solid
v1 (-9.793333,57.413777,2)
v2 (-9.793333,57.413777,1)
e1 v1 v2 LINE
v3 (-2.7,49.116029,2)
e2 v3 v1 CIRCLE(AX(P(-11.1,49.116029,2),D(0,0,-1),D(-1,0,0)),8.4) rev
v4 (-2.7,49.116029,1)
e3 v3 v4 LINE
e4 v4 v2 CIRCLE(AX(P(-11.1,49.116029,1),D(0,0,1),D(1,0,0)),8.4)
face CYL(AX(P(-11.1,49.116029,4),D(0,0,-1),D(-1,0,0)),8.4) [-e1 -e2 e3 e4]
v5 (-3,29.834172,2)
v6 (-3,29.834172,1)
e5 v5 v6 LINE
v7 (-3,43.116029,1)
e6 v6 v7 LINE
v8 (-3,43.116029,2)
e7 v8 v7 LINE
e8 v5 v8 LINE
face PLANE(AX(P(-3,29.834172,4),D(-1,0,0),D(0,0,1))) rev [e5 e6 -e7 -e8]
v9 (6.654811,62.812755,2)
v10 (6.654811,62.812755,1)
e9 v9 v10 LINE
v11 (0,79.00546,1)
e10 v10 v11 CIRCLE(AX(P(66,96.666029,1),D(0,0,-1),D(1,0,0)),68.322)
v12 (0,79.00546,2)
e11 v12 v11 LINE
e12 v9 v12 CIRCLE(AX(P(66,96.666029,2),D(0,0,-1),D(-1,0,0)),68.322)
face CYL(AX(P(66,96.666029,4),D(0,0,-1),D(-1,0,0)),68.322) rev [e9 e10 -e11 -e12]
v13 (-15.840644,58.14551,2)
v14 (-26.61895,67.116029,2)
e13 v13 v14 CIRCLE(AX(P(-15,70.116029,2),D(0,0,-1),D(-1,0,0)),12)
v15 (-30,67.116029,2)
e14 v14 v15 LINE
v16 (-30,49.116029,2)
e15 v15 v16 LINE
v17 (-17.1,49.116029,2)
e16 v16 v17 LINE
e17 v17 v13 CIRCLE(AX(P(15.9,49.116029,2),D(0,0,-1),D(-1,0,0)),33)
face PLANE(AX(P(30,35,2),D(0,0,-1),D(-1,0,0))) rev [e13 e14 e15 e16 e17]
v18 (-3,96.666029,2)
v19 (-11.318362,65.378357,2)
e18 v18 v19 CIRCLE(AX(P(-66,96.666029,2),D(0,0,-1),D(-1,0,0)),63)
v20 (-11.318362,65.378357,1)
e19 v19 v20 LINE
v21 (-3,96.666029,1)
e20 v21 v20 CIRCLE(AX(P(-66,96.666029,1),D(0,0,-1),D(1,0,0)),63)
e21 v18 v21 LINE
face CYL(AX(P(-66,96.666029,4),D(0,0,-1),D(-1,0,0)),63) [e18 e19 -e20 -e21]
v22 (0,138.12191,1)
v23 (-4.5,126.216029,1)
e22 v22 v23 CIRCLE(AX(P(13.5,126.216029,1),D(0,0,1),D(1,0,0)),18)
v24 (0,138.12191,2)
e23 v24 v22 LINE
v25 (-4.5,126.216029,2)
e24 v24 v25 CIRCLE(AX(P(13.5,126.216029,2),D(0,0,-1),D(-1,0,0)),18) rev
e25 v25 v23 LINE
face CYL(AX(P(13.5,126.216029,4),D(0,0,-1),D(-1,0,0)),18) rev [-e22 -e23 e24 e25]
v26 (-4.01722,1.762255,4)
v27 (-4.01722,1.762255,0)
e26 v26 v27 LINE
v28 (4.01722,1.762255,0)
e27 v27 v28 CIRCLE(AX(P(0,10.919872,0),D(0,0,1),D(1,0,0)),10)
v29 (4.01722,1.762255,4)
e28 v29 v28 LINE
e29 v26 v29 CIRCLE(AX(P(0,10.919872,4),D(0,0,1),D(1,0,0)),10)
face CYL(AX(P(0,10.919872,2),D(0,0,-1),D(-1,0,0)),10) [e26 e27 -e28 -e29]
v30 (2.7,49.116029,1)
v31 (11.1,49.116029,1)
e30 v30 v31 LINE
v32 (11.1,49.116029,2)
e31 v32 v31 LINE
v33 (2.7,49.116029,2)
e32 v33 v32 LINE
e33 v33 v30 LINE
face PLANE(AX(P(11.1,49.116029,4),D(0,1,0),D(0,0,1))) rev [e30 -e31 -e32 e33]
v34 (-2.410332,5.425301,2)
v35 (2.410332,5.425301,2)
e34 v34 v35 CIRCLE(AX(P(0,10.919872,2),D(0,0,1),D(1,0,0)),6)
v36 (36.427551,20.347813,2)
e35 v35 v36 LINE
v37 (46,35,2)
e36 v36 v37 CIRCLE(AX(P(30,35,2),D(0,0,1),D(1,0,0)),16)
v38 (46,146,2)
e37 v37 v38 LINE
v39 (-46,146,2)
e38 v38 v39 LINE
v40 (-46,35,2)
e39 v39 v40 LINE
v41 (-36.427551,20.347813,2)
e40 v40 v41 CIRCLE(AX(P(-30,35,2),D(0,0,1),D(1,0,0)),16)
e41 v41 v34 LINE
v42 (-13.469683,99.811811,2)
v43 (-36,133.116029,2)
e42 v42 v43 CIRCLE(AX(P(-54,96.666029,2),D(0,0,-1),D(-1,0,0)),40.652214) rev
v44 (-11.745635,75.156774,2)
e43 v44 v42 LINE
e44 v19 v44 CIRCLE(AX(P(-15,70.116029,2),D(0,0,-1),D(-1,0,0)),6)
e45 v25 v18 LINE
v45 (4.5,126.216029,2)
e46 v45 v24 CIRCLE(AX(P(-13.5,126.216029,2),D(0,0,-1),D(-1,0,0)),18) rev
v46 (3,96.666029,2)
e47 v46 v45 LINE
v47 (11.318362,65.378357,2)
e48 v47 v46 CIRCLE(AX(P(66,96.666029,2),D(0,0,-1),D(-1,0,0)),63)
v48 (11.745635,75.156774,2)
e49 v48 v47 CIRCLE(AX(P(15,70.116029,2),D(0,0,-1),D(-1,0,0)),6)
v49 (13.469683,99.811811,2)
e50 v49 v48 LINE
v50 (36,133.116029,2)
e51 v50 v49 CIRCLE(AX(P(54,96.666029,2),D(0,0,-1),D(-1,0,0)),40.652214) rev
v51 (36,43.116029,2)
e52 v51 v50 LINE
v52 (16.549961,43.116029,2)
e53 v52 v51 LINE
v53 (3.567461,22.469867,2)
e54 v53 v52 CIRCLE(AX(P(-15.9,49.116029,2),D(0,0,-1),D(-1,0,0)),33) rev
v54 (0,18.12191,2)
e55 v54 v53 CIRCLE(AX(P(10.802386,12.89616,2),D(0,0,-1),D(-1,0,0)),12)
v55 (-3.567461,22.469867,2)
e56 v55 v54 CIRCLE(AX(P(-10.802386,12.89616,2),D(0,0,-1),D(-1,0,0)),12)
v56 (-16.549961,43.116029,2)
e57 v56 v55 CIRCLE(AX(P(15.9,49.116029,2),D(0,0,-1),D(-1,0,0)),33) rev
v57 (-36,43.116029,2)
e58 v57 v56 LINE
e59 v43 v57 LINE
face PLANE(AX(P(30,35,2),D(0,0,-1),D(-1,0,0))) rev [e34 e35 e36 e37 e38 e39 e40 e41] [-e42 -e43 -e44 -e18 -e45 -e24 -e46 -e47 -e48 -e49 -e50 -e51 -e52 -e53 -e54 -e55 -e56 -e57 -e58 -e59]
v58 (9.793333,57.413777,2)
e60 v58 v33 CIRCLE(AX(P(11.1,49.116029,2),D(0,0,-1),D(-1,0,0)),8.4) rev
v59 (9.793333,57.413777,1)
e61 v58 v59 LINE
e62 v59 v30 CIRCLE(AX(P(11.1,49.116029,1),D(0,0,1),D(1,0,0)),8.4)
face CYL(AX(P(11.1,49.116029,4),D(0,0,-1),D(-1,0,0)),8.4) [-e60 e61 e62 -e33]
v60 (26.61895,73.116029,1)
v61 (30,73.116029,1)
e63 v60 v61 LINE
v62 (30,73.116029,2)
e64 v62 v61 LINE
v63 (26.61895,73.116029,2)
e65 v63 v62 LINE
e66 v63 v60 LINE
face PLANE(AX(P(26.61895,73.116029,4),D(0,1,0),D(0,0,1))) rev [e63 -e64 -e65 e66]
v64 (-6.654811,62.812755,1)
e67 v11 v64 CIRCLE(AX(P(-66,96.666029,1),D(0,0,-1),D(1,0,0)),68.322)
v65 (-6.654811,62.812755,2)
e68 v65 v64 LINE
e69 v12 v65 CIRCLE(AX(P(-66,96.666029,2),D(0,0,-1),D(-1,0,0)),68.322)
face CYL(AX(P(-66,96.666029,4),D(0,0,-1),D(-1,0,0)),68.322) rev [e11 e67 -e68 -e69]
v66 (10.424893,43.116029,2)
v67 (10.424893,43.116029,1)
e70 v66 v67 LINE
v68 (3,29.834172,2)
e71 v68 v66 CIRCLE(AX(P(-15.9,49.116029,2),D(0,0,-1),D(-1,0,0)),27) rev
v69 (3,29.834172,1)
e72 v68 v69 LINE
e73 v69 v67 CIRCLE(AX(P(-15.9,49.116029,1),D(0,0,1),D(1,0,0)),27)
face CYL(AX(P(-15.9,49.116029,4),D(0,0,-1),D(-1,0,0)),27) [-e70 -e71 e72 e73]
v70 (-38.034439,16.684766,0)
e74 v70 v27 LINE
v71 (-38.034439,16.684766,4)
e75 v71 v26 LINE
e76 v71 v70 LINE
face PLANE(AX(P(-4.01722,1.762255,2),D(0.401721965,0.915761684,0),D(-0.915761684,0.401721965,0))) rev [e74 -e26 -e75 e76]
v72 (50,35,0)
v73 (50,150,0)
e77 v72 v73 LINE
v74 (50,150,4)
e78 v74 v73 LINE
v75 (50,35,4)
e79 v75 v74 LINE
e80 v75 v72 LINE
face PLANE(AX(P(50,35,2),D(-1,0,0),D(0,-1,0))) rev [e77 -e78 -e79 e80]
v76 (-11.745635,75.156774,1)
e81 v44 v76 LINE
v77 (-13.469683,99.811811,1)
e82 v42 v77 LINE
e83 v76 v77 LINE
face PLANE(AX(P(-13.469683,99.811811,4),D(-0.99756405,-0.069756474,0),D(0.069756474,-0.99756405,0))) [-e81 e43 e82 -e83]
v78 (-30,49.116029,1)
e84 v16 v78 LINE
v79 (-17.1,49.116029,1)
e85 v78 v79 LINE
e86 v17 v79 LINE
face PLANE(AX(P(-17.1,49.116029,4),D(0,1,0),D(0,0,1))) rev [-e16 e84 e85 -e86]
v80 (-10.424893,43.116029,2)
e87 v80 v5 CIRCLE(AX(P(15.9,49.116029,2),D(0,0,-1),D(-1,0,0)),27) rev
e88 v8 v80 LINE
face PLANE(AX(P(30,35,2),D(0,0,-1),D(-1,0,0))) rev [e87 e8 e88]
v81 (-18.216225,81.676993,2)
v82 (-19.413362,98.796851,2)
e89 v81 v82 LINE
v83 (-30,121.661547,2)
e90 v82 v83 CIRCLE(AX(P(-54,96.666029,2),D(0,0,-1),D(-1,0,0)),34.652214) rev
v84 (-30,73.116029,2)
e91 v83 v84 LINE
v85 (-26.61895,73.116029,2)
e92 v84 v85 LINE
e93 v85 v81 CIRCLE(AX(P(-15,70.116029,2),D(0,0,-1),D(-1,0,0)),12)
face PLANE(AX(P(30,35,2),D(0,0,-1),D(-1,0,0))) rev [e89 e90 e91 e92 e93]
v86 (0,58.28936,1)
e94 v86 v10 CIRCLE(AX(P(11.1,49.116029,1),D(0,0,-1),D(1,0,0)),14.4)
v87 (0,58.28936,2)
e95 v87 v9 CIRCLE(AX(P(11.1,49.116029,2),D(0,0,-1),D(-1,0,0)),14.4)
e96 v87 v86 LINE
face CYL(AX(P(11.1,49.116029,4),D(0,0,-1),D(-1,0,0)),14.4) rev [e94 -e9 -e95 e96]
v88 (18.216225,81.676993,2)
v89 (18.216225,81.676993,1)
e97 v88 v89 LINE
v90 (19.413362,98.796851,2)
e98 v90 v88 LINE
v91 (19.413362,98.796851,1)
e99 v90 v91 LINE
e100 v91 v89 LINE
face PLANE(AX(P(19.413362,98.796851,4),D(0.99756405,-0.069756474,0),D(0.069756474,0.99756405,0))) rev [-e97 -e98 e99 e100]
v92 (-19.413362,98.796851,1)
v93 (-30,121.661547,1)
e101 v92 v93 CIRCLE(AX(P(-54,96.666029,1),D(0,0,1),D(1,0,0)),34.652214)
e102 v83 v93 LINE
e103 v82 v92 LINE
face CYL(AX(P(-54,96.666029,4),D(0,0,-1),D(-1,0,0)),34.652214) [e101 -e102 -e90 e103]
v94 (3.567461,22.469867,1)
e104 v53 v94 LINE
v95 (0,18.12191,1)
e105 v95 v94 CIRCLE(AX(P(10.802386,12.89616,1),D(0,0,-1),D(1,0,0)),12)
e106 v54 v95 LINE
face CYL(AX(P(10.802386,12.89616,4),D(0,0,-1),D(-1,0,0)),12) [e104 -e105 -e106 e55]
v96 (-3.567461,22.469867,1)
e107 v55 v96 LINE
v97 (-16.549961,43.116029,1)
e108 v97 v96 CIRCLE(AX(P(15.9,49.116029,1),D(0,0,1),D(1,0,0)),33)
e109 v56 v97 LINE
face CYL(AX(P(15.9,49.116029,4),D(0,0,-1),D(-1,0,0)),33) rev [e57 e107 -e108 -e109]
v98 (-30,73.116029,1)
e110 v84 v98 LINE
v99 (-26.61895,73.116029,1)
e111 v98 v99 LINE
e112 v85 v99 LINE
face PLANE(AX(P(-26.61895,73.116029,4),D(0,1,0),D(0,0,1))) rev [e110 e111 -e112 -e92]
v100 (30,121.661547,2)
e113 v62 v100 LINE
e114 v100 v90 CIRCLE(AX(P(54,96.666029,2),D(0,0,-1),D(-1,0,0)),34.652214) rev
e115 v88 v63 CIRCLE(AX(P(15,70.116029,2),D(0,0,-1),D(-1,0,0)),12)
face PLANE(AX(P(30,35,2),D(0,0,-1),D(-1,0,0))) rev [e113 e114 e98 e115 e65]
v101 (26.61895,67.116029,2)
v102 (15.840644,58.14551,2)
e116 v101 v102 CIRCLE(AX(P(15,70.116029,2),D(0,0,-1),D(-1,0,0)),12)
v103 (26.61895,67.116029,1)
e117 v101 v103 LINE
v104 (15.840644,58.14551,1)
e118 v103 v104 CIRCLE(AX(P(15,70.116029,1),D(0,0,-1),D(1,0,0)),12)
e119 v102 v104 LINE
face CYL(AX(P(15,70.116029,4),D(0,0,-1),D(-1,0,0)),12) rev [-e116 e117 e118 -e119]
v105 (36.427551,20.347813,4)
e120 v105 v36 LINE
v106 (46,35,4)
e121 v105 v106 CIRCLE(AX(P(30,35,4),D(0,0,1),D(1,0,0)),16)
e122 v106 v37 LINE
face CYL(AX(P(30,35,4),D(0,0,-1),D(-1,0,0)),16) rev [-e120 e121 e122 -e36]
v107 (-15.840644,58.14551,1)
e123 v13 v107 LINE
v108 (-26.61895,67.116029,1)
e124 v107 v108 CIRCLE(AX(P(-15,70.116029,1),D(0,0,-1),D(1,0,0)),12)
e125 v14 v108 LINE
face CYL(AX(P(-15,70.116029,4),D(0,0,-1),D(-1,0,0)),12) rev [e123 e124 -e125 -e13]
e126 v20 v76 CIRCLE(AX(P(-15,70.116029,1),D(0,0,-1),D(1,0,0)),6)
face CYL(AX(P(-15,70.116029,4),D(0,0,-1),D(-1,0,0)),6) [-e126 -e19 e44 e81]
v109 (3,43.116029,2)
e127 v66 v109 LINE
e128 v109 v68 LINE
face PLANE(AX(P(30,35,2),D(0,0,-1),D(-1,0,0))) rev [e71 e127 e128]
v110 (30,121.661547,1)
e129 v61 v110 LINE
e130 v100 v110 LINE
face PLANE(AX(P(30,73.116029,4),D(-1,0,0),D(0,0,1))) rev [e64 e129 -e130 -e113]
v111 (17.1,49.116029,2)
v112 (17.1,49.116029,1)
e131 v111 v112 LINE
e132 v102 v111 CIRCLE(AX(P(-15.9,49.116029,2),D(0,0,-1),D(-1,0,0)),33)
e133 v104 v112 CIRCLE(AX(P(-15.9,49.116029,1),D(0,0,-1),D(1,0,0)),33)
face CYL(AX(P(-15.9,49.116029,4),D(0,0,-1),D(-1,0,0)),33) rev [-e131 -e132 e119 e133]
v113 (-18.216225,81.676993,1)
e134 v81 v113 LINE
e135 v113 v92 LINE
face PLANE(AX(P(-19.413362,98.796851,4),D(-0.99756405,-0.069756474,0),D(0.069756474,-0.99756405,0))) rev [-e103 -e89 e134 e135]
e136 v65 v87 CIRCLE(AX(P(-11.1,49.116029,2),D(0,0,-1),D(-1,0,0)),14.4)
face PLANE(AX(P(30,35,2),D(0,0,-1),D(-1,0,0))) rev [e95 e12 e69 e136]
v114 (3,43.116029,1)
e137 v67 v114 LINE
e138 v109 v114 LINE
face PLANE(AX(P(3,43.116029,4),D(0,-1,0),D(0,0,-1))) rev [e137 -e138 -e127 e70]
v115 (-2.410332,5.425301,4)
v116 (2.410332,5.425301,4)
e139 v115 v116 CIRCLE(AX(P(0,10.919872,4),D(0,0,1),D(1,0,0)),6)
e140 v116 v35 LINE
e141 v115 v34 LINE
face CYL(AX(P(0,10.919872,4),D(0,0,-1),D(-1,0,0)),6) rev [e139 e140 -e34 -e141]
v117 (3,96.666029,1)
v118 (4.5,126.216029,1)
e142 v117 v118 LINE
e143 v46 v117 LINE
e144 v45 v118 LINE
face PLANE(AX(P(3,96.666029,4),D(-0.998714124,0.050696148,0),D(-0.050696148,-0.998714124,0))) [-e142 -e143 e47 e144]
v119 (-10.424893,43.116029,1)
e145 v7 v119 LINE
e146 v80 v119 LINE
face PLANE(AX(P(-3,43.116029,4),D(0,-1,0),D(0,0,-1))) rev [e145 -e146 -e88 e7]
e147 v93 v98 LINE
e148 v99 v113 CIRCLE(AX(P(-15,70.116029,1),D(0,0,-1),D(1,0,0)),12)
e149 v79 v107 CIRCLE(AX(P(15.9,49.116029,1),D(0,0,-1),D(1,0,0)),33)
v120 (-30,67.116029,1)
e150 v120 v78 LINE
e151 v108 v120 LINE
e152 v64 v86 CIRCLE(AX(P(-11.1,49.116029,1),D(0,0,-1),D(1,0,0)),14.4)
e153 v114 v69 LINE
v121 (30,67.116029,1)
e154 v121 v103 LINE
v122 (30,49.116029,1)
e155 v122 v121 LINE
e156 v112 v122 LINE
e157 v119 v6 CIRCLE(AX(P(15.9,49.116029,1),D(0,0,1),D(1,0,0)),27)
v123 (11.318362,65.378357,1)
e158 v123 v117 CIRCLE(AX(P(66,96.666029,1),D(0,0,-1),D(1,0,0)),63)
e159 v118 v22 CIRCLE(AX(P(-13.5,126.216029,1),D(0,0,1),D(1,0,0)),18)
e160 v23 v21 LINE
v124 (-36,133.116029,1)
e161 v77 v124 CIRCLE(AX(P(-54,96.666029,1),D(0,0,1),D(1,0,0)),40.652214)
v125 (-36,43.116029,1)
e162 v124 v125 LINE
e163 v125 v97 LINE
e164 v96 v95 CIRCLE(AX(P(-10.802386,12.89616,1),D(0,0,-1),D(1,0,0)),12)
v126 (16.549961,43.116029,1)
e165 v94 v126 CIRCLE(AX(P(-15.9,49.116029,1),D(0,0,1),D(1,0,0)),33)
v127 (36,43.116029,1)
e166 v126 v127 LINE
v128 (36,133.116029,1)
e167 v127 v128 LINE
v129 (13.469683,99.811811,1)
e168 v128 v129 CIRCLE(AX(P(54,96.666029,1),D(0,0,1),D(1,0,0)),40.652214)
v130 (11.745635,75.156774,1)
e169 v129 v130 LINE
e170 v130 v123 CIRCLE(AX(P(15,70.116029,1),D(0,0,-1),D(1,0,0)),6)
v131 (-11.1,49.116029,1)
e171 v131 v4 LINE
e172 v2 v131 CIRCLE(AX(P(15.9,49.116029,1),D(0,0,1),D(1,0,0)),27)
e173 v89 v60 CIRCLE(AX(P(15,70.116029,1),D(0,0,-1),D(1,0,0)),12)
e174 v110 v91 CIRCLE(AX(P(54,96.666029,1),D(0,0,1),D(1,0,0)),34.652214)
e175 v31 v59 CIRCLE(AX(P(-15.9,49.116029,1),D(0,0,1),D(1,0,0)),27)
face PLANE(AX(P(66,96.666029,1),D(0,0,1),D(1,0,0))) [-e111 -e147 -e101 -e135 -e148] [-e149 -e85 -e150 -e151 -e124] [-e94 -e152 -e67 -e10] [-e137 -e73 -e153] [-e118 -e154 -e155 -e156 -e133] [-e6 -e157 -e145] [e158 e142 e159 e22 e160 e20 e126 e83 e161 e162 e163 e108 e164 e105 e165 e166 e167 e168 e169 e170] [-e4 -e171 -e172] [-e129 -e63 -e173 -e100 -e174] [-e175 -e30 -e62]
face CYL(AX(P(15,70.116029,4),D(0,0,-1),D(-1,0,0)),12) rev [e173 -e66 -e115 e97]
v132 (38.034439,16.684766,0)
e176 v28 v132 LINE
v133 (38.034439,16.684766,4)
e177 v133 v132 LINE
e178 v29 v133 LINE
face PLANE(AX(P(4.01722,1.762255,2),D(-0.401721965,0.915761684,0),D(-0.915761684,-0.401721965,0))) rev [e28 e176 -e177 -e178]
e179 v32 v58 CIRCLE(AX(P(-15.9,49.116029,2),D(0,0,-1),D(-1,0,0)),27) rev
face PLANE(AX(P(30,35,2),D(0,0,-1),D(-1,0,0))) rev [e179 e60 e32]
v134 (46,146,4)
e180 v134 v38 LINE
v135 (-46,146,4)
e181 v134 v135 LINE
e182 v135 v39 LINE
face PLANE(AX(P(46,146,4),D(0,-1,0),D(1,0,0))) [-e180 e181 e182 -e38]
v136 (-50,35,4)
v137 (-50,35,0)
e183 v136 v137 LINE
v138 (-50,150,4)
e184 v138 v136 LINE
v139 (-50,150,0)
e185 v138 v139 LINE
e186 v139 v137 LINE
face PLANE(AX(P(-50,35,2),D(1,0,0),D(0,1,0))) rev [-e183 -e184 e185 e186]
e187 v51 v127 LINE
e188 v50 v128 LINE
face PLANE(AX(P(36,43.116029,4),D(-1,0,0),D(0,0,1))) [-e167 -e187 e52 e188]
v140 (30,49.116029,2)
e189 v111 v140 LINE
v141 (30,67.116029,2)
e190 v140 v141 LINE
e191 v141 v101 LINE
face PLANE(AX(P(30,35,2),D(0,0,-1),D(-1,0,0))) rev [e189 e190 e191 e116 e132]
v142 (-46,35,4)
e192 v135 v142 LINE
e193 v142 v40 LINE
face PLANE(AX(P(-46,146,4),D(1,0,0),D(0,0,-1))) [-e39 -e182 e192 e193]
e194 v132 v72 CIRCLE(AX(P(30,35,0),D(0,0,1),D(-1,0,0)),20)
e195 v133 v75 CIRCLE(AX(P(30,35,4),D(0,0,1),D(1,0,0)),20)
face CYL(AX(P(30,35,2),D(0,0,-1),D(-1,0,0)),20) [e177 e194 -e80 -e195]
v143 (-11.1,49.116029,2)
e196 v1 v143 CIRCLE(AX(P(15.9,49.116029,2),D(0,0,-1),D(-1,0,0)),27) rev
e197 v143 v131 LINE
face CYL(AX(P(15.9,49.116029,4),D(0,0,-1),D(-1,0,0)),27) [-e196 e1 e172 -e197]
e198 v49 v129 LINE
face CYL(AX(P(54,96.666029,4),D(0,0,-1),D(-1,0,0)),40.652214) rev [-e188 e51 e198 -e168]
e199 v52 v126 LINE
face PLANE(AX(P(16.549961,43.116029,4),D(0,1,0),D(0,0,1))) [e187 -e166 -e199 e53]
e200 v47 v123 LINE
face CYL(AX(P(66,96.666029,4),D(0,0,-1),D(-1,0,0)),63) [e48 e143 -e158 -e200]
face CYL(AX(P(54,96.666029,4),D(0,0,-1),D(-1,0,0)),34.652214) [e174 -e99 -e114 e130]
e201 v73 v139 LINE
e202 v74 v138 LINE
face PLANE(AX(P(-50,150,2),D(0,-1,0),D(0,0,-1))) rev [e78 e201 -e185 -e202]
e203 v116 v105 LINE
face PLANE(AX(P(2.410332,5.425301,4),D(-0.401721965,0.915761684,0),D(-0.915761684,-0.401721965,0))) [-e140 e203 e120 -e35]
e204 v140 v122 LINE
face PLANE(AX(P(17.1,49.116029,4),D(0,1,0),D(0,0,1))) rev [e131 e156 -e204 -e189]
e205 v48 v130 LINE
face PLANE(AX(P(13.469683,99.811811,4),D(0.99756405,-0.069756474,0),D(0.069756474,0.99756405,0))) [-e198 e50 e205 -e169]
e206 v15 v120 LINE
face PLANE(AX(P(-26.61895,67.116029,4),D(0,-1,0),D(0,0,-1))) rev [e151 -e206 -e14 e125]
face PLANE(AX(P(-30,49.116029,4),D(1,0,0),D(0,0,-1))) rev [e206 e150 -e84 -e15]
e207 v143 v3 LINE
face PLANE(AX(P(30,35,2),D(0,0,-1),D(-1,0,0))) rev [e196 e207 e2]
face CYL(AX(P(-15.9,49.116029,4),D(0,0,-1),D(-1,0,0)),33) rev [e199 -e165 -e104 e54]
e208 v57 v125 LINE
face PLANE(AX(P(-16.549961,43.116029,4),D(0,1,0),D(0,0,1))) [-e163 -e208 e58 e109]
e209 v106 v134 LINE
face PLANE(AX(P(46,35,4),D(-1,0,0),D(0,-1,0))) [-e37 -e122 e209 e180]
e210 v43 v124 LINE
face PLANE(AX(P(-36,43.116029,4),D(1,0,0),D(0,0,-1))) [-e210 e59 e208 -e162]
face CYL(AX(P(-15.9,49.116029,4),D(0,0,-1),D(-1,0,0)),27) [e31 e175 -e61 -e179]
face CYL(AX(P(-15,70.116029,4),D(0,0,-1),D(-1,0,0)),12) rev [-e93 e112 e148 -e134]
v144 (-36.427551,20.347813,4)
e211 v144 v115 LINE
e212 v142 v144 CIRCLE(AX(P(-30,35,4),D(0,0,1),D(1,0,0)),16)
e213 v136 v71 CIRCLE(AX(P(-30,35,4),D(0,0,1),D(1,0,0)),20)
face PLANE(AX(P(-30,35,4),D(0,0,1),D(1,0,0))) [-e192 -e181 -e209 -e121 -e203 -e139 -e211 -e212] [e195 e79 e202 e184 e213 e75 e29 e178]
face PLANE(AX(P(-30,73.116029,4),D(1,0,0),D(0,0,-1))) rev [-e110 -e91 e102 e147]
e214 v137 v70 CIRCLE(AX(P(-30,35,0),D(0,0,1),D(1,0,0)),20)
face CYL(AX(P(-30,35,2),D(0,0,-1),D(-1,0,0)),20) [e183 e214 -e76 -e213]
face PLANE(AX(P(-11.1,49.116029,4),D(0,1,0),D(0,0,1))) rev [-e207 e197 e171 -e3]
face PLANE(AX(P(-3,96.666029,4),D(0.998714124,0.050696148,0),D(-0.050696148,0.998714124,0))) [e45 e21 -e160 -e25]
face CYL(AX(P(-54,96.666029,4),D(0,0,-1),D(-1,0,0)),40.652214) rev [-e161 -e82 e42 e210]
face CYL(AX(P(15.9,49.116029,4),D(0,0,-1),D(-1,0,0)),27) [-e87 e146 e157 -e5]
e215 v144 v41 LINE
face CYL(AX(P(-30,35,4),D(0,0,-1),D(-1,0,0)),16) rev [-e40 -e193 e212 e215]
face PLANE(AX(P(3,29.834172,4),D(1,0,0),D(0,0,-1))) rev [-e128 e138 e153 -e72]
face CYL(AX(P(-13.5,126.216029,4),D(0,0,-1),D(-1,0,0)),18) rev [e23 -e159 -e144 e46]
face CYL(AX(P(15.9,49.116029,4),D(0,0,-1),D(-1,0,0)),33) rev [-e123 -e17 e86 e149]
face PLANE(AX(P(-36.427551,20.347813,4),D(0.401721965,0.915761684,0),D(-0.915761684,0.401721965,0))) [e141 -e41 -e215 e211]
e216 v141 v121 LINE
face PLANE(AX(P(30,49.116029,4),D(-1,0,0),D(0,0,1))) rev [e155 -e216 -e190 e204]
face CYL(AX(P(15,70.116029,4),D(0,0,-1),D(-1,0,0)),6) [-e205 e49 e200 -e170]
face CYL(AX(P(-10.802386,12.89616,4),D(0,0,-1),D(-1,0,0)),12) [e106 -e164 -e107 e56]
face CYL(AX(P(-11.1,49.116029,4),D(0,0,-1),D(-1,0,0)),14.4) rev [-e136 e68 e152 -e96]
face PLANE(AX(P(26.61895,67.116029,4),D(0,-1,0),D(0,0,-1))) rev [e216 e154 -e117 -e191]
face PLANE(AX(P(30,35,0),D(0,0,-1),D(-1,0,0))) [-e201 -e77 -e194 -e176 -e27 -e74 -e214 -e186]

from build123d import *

# Parameters (mm, degrees)
EXTRUDE_1_DEPTH = 2
EXTRUDE_2_DEPTH = 2
OTHER_START     = 1
OTHER_1_DEPTH   = 1


# Read off the part's stored shape, not the designer's step: Полость1
with BuildPart() as part:
    # Эскиз1 → Бобышка-Вытянуть1 (new body)
    with BuildSketch(Plane.XY):
        with BuildLine():
            Line((-4.017219652, 1.762254744), (-38.034439304, 16.684766311))
            ThreePointArc((-38.034439304, 16.684766311), (-46.743488079, 24.061279464), (-50, 35))
            Line((-50, 35), (-50, 150))
            Line((-50, 150), (50, 150))
            Line((50, 150), (50, 35))
            ThreePointArc((50, 35), (46.743488079, 24.061279464), (38.034439304, 16.684766311))
            Line((38.034439304, 16.684766311), (4.017219652, 1.762254744))
            ThreePointArc((4.017219652, 1.762254744), (0, 0.919871589), (-4.017219652, 1.762254744))
        make_face()
    extrude(amount=EXTRUDE_1_DEPTH)

    # Эскиз2 → Бобышка-Вытянуть2 (add)
    with BuildSketch(Plane.XY.offset(2)):
        with BuildLine():
            Line((50, 150), (-50, 150))
            Line((-50, 150), (-50, 35))
            ThreePointArc((-50, 35), (-46.743488079, 24.061279464), (-38.034439304, 16.684766311))
            Line((-38.034439304, 16.684766311), (-4.017219652, 1.762254744))
            ThreePointArc((-4.017219652, 1.762254744), (0, 0.919871589), (4.017219652, 1.762254744))
            Line((4.017219652, 1.762254744), (38.034439304, 16.684766311))
            ThreePointArc((38.034439304, 16.684766311), (46.743488079, 24.061279464), (50, 35))
            Line((50, 35), (50, 150))
        make_face()
        with BuildLine():
            Line((46, 146), (-46, 146))
            Line((-46, 146), (-46, 35))
            ThreePointArc((-46, 35), (-43.394790463, 26.249023571), (-36.427551443, 20.347813049))
            Line((-36.427551443, 20.347813049), (-2.410331791, 5.425301482))
            ThreePointArc((-2.410331791, 5.425301482), (0, 4.919871589), (2.410331791, 5.425301482))
            Line((2.410331791, 5.425301482), (36.427551443, 20.347813049))
            ThreePointArc((36.427551443, 20.347813049), (43.394790463, 26.249023571), (46, 35))
            Line((46, 35), (46, 146))
        make_face(mode=Mode.SUBTRACT)
    extrude(amount=EXTRUDE_2_DEPTH)

    # Полость1 outline → Полость1 (cut)
    with BuildSketch(Plane.XY.offset(OTHER_START)):
        with BuildLine():
            ThreePointArc((11.745635367, 75.156774095), (20.994280281, 69.854105541), (11.31836185, 65.378356547))
            ThreePointArc((11.31836185, 65.378356547), (5.115095453, 80.478737769), (3, 96.666029027))
            Line((3, 96.666029027), (4.5, 126.216029027))
            ThreePointArc((4.5, 126.216029027), (3.337458241, 132.579990058), (0, 138.121909927))
            ThreePointArc((0, 138.121909927), (-3.33745824, 132.579990058), (-4.5, 126.216029027))
            Line((-4.5, 126.216029027), (-3, 96.666029027))
            ThreePointArc((-3, 96.666029027), (-5.115095453, 80.478737769), (-11.31836185, 65.378356547))
            ThreePointArc((-11.31836185, 65.378356547), (-20.994280281, 69.854105541), (-11.745635367, 75.156774095))
            Line((-11.745635367, 75.156774095), (-13.469683479, 99.811810763))
            ThreePointArc((-13.469683479, 99.811810763), (-20.328911117, 119.444533663), (-36, 133.116029027))
            Line((-36, 133.116029027), (-36, 43.116029027))
            Line((-36, 43.116029027), (-16.549961479, 43.116029027))
            ThreePointArc((-16.549961479, 43.116029027), (-12.036010614, 31.549603352), (-3.567460781, 22.469866625))
            ThreePointArc((-3.567460781, 22.469866625), (-1.525407448, 20.507840011), (0, 18.121909927))
            ThreePointArc((0, 18.121909927), (1.525407448, 20.507840011), (3.567460781, 22.469866625))
            ThreePointArc((3.567460781, 22.469866625), (12.036010614, 31.549603352), (16.549961479, 43.116029027))
            Line((16.549961479, 43.116029027), (36, 43.116029027))
            Line((36, 43.116029027), (36, 133.116029027))
            ThreePointArc((36, 133.116029027), (20.328911117, 119.444533663), (13.469683479, 99.811810763))
            Line((13.469683479, 99.811810763), (11.745635367, 75.156774095))
        make_face()
        with BuildLine():
            ThreePointArc((-3, 29.83417227), (-7.667449376, 35.941229982), (-10.424893162, 43.116029027))
            Line((-10.424893162, 43.116029027), (-3, 43.116029027))
            Line((-3, 43.116029027), (-3, 29.83417227))
        make_face(mode=Mode.SUBTRACT)
        with BuildLine():
            ThreePointArc((-15.840643779, 58.145510324), (-16.78364457, 53.674469292), (-17.1, 49.116029027))
            Line((-17.1, 49.116029027), (-30, 49.116029027))
            Line((-30, 49.116029027), (-30, 67.116029027))
            Line((-30, 67.116029027), (-26.618950039, 67.116029027))
            ThreePointArc((-26.618950039, 67.116029027), (-22.676452369, 60.892576365), (-15.840643779, 58.145510324))
        make_face(mode=Mode.SUBTRACT)
        with BuildLine():
            ThreePointArc((-9.793333333, 57.413777048), (-4.715017619, 54.57423386), (-2.7, 49.116029027))
            Line((-2.7, 49.116029027), (-11.1, 49.116029027))
            ThreePointArc((-11.1, 49.116029027), (-10.771332925, 53.316029027), (-9.793333333, 57.413777048))
        make_face(mode=Mode.SUBTRACT)
        with BuildLine():
            Line((3, 29.83417227), (3, 43.116029027))
            Line((3, 43.116029027), (10.424893162, 43.116029027))
            ThreePointArc((10.424893162, 43.116029027), (7.667449376, 35.941229982), (3, 29.83417227))
        make_face(mode=Mode.SUBTRACT)
        with BuildLine():
            ThreePointArc((2.7, 49.116029027), (4.715017619, 54.57423386), (9.793333333, 57.413777048))
            ThreePointArc((9.793333333, 57.413777048), (10.771332925, 53.316029027), (11.1, 49.116029027))
            Line((11.1, 49.116029027), (2.7, 49.116029027))
        make_face(mode=Mode.SUBTRACT)
        with BuildLine():
            ThreePointArc((0, 79.005460407), (2.806605948, 70.695071551), (6.654810678, 62.812754617))
            ThreePointArc((6.654810678, 62.812754617), (3.005032266, 61.025332003), (0, 58.289359938))
            ThreePointArc((0, 58.289359938), (-3.005032266, 61.025332003), (-6.654810678, 62.812754617))
            ThreePointArc((-6.654810678, 62.812754617), (-2.806605948, 70.695071551), (0, 79.005460407))
        make_face(mode=Mode.SUBTRACT)
        with BuildLine():
            ThreePointArc((17.1, 49.116029027), (16.78364457, 53.674469292), (15.840643779, 58.145510324))
            ThreePointArc((15.840643779, 58.145510324), (22.676452369, 60.892576365), (26.618950039, 67.116029027))
            Line((26.618950039, 67.116029027), (30, 67.116029027))
            Line((30, 67.116029027), (30, 49.116029027))
            Line((30, 49.116029027), (17.1, 49.116029027))
        make_face(mode=Mode.SUBTRACT)
        with BuildLine():
            ThreePointArc((-18.216224905, 81.676993406), (-23.564060467, 78.521793021), (-26.618950039, 73.116029027))
            Line((-26.618950039, 73.116029027), (-30, 73.116029027))
            Line((-30, 73.116029027), (-30, 121.661547275))
            ThreePointArc((-30, 121.661547275), (-22.554855421, 111.225521288), (-19.413361995, 98.796851397))
            Line((-19.413361995, 98.796851397), (-18.216224905, 81.676993406))
        make_face(mode=Mode.SUBTRACT)
        with BuildLine():
            ThreePointArc((19.413361995, 98.796851397), (22.554855421, 111.225521288), (30, 121.661547275))
            Line((30, 121.661547275), (30, 73.116029027))
            Line((30, 73.116029027), (26.618950039, 73.116029027))
            ThreePointArc((26.618950039, 73.116029027), (23.564060467, 78.521793021), (18.216224905, 81.676993406))
            Line((18.216224905, 81.676993406), (19.413361995, 98.796851397))
        make_face(mode=Mode.SUBTRACT)
    extrude(amount=OTHER_1_DEPTH, mode=Mode.SUBTRACT)


solid = part.part
